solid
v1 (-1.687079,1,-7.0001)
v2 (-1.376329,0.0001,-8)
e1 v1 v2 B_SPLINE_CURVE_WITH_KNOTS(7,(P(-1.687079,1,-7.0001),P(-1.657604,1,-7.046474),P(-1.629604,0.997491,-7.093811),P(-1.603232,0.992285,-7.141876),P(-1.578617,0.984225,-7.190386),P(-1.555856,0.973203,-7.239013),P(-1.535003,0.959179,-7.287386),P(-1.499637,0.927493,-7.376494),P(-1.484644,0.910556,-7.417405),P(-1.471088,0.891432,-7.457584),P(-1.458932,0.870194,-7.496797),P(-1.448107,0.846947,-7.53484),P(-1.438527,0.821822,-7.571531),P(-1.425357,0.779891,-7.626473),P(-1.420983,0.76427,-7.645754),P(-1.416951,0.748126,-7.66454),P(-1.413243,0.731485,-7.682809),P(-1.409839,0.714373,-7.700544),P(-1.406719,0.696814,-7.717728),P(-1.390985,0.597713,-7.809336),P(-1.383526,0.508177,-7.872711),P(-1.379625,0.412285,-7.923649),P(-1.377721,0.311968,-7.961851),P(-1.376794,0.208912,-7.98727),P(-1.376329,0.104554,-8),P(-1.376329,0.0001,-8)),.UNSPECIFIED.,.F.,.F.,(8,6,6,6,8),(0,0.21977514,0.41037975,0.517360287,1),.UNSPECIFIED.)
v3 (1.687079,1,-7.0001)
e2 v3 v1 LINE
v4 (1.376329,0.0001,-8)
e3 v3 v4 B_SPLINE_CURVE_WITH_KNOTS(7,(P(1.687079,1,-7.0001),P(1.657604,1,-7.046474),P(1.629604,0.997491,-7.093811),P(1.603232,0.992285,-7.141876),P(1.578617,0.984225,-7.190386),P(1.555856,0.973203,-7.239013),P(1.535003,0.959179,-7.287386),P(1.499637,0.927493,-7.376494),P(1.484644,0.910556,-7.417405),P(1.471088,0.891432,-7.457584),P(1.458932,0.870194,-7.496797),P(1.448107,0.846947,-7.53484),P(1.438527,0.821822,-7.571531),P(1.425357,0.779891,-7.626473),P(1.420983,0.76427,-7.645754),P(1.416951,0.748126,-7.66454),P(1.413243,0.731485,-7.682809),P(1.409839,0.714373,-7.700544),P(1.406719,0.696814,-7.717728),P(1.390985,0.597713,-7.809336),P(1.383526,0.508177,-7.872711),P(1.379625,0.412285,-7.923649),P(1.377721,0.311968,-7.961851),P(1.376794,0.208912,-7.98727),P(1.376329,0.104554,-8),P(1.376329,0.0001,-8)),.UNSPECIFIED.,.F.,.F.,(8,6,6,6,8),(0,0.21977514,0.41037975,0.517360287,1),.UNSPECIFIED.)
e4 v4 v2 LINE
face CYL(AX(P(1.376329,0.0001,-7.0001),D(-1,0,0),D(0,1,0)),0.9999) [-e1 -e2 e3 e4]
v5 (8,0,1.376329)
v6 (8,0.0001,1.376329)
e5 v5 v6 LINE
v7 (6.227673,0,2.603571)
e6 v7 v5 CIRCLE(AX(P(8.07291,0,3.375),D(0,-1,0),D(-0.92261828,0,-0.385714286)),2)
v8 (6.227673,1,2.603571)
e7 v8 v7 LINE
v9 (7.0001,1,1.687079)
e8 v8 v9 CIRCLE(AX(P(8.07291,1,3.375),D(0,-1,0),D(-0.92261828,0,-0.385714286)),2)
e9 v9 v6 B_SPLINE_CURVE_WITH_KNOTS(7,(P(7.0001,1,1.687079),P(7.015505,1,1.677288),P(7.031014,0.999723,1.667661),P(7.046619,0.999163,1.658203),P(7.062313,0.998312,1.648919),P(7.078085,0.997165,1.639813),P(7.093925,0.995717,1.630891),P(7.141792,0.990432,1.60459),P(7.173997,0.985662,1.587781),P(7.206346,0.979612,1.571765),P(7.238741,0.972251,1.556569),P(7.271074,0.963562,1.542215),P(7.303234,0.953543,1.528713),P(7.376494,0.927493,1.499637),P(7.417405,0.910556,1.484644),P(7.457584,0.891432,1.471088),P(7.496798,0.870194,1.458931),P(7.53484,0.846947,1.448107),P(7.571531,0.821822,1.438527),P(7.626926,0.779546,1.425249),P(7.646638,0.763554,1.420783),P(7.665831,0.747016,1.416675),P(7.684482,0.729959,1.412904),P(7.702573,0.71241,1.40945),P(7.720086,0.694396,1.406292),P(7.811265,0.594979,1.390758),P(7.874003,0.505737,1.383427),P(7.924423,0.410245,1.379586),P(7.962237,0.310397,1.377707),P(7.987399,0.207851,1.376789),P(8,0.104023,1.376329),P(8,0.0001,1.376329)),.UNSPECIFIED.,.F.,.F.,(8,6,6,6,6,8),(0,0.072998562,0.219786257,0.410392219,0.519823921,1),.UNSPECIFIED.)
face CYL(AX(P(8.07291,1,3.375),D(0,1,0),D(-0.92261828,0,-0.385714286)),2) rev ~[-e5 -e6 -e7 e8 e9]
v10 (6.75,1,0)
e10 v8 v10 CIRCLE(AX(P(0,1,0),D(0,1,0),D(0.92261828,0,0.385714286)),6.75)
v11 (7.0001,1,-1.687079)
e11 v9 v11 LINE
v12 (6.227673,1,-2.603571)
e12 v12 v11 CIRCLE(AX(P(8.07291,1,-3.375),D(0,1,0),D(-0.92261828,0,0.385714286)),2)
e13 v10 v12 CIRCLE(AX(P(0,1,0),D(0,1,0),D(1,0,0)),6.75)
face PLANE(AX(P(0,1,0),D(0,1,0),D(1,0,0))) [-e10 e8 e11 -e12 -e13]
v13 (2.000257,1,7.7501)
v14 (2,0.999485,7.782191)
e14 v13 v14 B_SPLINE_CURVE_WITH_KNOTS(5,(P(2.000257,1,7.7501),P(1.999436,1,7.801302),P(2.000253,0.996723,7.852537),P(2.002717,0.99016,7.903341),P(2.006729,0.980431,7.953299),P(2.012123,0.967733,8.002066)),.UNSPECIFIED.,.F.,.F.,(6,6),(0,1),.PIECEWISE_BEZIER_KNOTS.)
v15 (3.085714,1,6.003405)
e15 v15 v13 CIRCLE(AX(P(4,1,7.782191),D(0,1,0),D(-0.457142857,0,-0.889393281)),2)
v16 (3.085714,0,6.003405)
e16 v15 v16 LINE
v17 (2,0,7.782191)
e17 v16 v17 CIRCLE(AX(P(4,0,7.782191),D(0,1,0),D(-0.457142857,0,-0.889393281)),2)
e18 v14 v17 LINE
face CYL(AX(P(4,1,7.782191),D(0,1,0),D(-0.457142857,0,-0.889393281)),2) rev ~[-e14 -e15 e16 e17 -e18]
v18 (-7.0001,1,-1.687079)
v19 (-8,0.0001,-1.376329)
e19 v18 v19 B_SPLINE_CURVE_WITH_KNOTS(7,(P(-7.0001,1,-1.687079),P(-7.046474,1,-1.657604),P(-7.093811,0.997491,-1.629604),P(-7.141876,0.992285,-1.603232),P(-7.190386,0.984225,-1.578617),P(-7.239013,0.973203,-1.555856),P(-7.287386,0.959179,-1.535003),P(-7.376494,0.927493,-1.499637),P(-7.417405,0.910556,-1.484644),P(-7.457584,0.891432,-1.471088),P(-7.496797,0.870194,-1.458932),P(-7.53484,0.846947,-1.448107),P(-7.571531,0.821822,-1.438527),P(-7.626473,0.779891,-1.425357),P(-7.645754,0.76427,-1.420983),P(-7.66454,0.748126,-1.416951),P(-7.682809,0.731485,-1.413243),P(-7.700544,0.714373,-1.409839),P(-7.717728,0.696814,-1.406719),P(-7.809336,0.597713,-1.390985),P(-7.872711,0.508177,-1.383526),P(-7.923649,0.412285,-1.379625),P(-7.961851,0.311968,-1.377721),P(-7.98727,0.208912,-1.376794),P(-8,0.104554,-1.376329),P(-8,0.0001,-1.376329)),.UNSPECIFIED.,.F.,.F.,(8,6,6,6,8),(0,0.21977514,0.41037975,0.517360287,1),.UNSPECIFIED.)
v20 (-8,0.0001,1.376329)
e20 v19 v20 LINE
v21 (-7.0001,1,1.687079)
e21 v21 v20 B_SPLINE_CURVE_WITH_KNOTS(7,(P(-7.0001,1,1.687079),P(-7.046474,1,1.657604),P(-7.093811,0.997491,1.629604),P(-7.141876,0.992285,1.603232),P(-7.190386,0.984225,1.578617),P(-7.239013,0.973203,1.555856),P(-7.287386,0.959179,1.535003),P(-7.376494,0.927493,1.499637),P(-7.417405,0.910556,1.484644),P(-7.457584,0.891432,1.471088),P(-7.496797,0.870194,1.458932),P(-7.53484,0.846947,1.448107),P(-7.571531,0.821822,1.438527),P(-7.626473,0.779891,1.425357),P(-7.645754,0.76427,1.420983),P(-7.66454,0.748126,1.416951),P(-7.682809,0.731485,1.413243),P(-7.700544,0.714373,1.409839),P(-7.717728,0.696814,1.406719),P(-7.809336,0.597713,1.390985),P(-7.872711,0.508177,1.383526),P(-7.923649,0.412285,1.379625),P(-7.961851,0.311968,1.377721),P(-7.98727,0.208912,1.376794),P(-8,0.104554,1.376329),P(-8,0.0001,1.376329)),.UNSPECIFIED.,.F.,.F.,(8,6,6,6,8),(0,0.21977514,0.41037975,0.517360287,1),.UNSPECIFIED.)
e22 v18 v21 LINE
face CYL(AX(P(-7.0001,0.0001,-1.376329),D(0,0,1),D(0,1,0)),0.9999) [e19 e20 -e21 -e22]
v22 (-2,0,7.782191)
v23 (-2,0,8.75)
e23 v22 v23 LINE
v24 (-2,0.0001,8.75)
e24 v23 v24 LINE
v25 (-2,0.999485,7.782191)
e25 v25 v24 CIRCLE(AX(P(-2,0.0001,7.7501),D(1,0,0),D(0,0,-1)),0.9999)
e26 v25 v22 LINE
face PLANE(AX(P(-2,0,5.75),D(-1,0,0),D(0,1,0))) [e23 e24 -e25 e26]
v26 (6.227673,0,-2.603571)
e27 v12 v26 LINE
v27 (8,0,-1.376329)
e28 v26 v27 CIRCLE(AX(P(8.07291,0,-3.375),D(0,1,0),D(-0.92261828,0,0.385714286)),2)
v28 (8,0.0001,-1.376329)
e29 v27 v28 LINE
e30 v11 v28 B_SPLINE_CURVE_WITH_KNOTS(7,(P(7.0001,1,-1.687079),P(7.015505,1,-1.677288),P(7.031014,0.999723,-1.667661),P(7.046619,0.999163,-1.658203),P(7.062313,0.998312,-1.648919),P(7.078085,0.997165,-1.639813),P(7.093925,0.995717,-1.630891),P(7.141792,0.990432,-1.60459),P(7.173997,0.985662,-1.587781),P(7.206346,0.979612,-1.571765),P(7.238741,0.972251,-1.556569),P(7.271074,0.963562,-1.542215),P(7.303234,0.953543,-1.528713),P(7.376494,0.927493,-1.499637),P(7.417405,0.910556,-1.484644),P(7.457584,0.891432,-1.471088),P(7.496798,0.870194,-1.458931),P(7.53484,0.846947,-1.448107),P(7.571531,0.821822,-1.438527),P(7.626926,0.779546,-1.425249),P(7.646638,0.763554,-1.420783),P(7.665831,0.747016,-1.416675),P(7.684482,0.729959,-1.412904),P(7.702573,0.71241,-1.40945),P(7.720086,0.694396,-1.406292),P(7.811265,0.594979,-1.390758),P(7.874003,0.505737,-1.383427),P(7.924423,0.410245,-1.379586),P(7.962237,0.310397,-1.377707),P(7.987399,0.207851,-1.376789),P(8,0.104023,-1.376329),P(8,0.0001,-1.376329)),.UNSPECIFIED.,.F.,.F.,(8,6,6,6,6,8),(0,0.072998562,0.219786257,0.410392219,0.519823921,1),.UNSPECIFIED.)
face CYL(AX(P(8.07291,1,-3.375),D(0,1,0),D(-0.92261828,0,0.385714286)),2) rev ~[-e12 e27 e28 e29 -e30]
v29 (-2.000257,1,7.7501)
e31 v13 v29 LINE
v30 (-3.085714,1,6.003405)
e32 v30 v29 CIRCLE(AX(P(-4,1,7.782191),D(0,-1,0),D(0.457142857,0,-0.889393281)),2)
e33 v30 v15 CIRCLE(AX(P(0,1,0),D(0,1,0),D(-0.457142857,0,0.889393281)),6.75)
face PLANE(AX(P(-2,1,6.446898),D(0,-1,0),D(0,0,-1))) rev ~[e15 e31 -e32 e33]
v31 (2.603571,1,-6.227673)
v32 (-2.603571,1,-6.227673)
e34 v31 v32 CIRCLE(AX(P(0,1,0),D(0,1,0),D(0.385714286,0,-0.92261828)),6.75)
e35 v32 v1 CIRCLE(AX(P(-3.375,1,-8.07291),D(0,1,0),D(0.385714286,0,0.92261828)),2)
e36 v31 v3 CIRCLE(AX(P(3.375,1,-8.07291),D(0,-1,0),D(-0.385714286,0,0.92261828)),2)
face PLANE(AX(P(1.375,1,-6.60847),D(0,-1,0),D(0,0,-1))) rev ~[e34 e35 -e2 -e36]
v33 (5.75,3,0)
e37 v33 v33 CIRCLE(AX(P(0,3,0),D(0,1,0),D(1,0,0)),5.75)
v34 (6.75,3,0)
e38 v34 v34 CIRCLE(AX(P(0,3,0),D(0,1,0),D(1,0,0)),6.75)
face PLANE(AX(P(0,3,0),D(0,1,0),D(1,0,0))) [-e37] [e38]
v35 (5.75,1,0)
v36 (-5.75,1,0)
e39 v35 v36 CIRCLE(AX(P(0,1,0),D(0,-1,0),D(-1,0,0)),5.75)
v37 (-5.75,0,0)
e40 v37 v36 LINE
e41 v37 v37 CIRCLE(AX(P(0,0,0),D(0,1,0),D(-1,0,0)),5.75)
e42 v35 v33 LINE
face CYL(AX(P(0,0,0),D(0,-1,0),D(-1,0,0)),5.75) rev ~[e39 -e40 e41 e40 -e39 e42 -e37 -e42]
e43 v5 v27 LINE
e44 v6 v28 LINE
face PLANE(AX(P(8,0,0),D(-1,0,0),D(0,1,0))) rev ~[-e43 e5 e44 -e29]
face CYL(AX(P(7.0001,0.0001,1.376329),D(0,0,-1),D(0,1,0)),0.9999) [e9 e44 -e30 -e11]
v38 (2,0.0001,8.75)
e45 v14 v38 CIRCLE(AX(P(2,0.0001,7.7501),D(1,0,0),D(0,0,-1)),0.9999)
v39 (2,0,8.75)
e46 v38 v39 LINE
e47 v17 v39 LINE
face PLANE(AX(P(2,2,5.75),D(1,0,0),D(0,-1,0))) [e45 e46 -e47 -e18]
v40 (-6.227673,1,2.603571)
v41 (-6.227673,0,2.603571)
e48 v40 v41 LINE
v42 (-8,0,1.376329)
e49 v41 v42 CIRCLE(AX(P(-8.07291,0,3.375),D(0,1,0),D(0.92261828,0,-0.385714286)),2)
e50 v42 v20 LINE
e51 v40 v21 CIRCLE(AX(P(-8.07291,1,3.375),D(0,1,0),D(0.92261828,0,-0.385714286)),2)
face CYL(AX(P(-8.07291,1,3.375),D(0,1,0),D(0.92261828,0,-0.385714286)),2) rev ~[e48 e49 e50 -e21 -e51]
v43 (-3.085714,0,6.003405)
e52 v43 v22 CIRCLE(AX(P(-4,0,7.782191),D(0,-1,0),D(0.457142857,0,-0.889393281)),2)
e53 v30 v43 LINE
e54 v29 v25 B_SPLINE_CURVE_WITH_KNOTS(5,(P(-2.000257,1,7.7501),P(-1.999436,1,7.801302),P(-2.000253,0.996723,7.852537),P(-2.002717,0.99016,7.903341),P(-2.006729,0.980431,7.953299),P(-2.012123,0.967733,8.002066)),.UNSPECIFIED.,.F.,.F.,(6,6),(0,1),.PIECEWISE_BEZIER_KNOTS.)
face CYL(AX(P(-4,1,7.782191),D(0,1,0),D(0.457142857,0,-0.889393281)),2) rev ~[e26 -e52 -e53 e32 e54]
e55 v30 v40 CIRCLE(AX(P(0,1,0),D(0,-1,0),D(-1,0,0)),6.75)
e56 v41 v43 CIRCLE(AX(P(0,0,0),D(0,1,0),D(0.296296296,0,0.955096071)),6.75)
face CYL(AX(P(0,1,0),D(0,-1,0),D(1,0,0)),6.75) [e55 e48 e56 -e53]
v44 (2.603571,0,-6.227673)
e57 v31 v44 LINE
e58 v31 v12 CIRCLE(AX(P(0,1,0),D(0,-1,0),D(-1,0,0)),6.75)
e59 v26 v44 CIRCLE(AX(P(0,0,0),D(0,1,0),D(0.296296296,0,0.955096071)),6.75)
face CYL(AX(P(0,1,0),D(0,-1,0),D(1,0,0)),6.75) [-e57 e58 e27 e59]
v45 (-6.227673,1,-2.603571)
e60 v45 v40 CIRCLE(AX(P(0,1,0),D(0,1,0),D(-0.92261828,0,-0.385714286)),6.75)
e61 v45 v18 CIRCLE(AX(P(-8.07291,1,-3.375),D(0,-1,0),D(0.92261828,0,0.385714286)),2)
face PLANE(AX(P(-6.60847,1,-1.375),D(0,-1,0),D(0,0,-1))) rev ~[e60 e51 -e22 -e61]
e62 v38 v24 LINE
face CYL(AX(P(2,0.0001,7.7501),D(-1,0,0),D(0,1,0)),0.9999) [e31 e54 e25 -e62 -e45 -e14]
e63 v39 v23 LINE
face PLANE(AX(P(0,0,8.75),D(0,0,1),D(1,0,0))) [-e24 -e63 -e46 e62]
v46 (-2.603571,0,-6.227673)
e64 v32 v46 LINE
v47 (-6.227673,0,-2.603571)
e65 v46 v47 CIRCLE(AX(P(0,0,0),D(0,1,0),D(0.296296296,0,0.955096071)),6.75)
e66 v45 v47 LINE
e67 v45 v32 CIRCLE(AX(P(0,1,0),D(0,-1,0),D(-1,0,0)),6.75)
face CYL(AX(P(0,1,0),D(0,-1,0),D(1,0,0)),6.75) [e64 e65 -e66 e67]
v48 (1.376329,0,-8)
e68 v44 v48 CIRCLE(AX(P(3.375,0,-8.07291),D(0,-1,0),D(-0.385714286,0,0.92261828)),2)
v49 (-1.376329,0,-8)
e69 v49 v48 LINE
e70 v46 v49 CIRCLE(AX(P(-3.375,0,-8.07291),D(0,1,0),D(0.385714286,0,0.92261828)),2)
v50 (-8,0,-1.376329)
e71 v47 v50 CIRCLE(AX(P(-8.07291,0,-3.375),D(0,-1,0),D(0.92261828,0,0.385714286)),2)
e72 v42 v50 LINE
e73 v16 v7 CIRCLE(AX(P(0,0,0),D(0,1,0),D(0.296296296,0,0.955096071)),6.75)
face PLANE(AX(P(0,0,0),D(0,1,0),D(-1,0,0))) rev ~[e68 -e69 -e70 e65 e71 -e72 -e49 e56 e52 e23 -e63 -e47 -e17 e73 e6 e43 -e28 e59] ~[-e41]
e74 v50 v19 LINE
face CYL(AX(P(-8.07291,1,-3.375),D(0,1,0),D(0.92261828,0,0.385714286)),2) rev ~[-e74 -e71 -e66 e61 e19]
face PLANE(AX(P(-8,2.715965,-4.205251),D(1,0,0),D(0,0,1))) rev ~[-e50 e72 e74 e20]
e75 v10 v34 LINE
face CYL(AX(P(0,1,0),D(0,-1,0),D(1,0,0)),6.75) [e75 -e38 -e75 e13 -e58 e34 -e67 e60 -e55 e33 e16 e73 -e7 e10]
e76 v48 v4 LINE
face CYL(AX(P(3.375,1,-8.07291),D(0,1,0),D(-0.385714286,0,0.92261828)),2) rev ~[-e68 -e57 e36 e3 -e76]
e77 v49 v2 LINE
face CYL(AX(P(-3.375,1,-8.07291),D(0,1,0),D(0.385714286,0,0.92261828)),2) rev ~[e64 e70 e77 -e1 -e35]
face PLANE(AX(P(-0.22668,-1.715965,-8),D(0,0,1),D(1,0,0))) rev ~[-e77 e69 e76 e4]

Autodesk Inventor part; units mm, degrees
ref_plane "XZ Plane" through (0, 0, 0) normal (0, 1, 0) x (-1, 0, 0)
sketch "Sketch1" plane through (0, 0, 0) normal (0, 1, 0) x (-1, 0, 0)
  circle A0 centre (0, 0) radius 5.75
  circle A1 centre (0, 0) radius 6.75
  dimension "d0" = 11.5
  dimension "d1" = 13.5
extrude "Extrusion1" add sketch "Sketch1" along normal blind 2
ref_plane "Work Plane1" through (0, 0, 5.75) normal (0, 0, 1) x (1, 0, 0)
ref_plane "Work Plane2" through (0, 0, -5.75) normal (0, 0, 1) x (1, 0, 0)
ref_plane "Work Plane3" through (5.75, 0, 0) normal (1, 0, 0) x (0, 1, 0)
ref_plane "Work Plane4" through (-5.75, 0, 0) normal (1, 0, 0) x (0, 1, 0)
sketch "Sketch4" plane through (0, 0, 5.75) normal (0, 0, 1) x (1, 0, 0)
  line L0 (6.75, 2) -> (-6.75, 2) projected
  line L1 (6.75, 0) -> (-6.75, 0) projected
  line L2 (-2, 2) -> (2, 2)
  line L3 (2, 2) -> (2, 0)
  line L4 (2, 0) -> (-2, 0)
  line L5 (-2, 0) -> (-2, 2)
  point P0 (0, 0)
  point P1 (0, 2)
  point P2 (-2, 0)
  dimension "d9" = 4
  dimension "d10" = 2
extrude "Extrusion3" add sketch "Sketch4" along normal blind 3
ref_plane "Work Plane5" through (0, 0, 0) normal (0, 0, 1) x (1, 0, 0)
sketch "Sketch6" plane through (-5.75, 0, 0) normal (1, 0, 0) x (0, 1, 0)
  line L0 (2, 5.75) -> (2, -5.75) projected
  line L1 (2, -1.375) -> (-1, -1.375)
  line L2 (-1, -1.375) -> (-1, 1.375)
  line L3 (-1, 1.375) -> (2, 1.375)
  line L4 (2, 1.375) -> (2, -1.375)
  line L5 (-1.6, 0) -> (2.6, 0) projected
  line L6 (0, -6.75) -> (0, 6.4469) projected
  point P0 (0, 0)
  point P1 (2, 1.375)
  dimension "d19" = 2.75
  dimension "d20" = 1.375
  dimension "d21" = 1
extrude "Extrusion5" add sketch "Sketch6" against normal blind 2.25
sketch "Sketch7" plane through (-5.75, -1, -1.375) normal (0, -1, 0) x (1, 0, 0)
  line L0 (0, 2.75) -> (0, 0) projected
  line L1 (0, 0.525) -> (-1.7, 0.525)
  line L2 (-1.7, 0.525) -> (-1.7, 2.225)
  line L3 (-1.7, 2.225) -> (0, 2.225)
  line L4 (0, 2.225) -> (0, 0.525)
  line L5 (-5.2, 1.375) -> (15.45, 1.375) projected
  circle A0 centre (5.75, 1.375) radius 6.25
  circle A1 centre (5.75, 1.375) radius 5.75
  point P0 (-0.4419, 0.525)
  point P1 (-0.4419, 2.225)
  dimension "d24" = 1.7
  dimension "d25" = 1.7
  dimension "d26" = 0.85
extrude "Extrusion6" cut sketch "Sketch7" against normal blind 1
pattern_circular "Circular Pattern1" count 3 over 180 about axis through (0, 0, 0) along (0, -1, 0) of "Extrusion5", "Extrusion6"
sketch "Sketch8" plane through (0, 2, 0) normal (0, 1, 0) x (1, 0, 0)
  circle A0 centre (0, 0) radius 5.75
  circle A1 centre (0, 0) radius 5.75 projected
  circle A2 centre (0, 0) radius 10
  dimension "d40" = 20
  dimension "d41" = 11.5
extrude "Extrusion7" cut sketch "Sketch8" against normal blind 1
sketch "Sketch9" plane through (0, 1, 0) normal (0, 1, 0) x (1, 0, 0)
  circle A0 centre (0, 0) radius 5.75
  circle A1 centre (0, 0) radius 5.75 projected
  circle A2 centre (0, 0) radius 6.75
  dimension "d38" = 13.5
  dimension "d39" = 11.5
extrude "Extrusion8" add sketch "Sketch9" along normal blind 2
fillet "Fillet1" radius 2 8 edges at (-6.6085, 0.5, -1.375) (-1.375, 0.5, -6.6085) (1.375, 0.5, -6.6085) (6.6085, 0.5, -1.375) (6.6085, 0.5, 1.375) (2, 0.5, 6.4469) (-2, 0.5, 6.4469) (-6.6085, 0.5, 1.375)
fillet "Fillet2" radius 1 4 edges at (-8, 1, 0) (0, 1, 8.75) (8, 1, 0) (0, 1, -8)
sketch "Sketch10" plane through (0, 0, 0) normal (0, -1, 0) x (1, 0, 0)
  circle A0 centre (0, 0) radius 9.4017
extrude "Extrusion9" cut sketch "Sketch10" along normal blind 5
equation "\"d20\" = 0.5 * d19"
equation "\"d26\" = 0.5 * d25"
properties part number "Widefield_Headplate_Adapter_Flat"
